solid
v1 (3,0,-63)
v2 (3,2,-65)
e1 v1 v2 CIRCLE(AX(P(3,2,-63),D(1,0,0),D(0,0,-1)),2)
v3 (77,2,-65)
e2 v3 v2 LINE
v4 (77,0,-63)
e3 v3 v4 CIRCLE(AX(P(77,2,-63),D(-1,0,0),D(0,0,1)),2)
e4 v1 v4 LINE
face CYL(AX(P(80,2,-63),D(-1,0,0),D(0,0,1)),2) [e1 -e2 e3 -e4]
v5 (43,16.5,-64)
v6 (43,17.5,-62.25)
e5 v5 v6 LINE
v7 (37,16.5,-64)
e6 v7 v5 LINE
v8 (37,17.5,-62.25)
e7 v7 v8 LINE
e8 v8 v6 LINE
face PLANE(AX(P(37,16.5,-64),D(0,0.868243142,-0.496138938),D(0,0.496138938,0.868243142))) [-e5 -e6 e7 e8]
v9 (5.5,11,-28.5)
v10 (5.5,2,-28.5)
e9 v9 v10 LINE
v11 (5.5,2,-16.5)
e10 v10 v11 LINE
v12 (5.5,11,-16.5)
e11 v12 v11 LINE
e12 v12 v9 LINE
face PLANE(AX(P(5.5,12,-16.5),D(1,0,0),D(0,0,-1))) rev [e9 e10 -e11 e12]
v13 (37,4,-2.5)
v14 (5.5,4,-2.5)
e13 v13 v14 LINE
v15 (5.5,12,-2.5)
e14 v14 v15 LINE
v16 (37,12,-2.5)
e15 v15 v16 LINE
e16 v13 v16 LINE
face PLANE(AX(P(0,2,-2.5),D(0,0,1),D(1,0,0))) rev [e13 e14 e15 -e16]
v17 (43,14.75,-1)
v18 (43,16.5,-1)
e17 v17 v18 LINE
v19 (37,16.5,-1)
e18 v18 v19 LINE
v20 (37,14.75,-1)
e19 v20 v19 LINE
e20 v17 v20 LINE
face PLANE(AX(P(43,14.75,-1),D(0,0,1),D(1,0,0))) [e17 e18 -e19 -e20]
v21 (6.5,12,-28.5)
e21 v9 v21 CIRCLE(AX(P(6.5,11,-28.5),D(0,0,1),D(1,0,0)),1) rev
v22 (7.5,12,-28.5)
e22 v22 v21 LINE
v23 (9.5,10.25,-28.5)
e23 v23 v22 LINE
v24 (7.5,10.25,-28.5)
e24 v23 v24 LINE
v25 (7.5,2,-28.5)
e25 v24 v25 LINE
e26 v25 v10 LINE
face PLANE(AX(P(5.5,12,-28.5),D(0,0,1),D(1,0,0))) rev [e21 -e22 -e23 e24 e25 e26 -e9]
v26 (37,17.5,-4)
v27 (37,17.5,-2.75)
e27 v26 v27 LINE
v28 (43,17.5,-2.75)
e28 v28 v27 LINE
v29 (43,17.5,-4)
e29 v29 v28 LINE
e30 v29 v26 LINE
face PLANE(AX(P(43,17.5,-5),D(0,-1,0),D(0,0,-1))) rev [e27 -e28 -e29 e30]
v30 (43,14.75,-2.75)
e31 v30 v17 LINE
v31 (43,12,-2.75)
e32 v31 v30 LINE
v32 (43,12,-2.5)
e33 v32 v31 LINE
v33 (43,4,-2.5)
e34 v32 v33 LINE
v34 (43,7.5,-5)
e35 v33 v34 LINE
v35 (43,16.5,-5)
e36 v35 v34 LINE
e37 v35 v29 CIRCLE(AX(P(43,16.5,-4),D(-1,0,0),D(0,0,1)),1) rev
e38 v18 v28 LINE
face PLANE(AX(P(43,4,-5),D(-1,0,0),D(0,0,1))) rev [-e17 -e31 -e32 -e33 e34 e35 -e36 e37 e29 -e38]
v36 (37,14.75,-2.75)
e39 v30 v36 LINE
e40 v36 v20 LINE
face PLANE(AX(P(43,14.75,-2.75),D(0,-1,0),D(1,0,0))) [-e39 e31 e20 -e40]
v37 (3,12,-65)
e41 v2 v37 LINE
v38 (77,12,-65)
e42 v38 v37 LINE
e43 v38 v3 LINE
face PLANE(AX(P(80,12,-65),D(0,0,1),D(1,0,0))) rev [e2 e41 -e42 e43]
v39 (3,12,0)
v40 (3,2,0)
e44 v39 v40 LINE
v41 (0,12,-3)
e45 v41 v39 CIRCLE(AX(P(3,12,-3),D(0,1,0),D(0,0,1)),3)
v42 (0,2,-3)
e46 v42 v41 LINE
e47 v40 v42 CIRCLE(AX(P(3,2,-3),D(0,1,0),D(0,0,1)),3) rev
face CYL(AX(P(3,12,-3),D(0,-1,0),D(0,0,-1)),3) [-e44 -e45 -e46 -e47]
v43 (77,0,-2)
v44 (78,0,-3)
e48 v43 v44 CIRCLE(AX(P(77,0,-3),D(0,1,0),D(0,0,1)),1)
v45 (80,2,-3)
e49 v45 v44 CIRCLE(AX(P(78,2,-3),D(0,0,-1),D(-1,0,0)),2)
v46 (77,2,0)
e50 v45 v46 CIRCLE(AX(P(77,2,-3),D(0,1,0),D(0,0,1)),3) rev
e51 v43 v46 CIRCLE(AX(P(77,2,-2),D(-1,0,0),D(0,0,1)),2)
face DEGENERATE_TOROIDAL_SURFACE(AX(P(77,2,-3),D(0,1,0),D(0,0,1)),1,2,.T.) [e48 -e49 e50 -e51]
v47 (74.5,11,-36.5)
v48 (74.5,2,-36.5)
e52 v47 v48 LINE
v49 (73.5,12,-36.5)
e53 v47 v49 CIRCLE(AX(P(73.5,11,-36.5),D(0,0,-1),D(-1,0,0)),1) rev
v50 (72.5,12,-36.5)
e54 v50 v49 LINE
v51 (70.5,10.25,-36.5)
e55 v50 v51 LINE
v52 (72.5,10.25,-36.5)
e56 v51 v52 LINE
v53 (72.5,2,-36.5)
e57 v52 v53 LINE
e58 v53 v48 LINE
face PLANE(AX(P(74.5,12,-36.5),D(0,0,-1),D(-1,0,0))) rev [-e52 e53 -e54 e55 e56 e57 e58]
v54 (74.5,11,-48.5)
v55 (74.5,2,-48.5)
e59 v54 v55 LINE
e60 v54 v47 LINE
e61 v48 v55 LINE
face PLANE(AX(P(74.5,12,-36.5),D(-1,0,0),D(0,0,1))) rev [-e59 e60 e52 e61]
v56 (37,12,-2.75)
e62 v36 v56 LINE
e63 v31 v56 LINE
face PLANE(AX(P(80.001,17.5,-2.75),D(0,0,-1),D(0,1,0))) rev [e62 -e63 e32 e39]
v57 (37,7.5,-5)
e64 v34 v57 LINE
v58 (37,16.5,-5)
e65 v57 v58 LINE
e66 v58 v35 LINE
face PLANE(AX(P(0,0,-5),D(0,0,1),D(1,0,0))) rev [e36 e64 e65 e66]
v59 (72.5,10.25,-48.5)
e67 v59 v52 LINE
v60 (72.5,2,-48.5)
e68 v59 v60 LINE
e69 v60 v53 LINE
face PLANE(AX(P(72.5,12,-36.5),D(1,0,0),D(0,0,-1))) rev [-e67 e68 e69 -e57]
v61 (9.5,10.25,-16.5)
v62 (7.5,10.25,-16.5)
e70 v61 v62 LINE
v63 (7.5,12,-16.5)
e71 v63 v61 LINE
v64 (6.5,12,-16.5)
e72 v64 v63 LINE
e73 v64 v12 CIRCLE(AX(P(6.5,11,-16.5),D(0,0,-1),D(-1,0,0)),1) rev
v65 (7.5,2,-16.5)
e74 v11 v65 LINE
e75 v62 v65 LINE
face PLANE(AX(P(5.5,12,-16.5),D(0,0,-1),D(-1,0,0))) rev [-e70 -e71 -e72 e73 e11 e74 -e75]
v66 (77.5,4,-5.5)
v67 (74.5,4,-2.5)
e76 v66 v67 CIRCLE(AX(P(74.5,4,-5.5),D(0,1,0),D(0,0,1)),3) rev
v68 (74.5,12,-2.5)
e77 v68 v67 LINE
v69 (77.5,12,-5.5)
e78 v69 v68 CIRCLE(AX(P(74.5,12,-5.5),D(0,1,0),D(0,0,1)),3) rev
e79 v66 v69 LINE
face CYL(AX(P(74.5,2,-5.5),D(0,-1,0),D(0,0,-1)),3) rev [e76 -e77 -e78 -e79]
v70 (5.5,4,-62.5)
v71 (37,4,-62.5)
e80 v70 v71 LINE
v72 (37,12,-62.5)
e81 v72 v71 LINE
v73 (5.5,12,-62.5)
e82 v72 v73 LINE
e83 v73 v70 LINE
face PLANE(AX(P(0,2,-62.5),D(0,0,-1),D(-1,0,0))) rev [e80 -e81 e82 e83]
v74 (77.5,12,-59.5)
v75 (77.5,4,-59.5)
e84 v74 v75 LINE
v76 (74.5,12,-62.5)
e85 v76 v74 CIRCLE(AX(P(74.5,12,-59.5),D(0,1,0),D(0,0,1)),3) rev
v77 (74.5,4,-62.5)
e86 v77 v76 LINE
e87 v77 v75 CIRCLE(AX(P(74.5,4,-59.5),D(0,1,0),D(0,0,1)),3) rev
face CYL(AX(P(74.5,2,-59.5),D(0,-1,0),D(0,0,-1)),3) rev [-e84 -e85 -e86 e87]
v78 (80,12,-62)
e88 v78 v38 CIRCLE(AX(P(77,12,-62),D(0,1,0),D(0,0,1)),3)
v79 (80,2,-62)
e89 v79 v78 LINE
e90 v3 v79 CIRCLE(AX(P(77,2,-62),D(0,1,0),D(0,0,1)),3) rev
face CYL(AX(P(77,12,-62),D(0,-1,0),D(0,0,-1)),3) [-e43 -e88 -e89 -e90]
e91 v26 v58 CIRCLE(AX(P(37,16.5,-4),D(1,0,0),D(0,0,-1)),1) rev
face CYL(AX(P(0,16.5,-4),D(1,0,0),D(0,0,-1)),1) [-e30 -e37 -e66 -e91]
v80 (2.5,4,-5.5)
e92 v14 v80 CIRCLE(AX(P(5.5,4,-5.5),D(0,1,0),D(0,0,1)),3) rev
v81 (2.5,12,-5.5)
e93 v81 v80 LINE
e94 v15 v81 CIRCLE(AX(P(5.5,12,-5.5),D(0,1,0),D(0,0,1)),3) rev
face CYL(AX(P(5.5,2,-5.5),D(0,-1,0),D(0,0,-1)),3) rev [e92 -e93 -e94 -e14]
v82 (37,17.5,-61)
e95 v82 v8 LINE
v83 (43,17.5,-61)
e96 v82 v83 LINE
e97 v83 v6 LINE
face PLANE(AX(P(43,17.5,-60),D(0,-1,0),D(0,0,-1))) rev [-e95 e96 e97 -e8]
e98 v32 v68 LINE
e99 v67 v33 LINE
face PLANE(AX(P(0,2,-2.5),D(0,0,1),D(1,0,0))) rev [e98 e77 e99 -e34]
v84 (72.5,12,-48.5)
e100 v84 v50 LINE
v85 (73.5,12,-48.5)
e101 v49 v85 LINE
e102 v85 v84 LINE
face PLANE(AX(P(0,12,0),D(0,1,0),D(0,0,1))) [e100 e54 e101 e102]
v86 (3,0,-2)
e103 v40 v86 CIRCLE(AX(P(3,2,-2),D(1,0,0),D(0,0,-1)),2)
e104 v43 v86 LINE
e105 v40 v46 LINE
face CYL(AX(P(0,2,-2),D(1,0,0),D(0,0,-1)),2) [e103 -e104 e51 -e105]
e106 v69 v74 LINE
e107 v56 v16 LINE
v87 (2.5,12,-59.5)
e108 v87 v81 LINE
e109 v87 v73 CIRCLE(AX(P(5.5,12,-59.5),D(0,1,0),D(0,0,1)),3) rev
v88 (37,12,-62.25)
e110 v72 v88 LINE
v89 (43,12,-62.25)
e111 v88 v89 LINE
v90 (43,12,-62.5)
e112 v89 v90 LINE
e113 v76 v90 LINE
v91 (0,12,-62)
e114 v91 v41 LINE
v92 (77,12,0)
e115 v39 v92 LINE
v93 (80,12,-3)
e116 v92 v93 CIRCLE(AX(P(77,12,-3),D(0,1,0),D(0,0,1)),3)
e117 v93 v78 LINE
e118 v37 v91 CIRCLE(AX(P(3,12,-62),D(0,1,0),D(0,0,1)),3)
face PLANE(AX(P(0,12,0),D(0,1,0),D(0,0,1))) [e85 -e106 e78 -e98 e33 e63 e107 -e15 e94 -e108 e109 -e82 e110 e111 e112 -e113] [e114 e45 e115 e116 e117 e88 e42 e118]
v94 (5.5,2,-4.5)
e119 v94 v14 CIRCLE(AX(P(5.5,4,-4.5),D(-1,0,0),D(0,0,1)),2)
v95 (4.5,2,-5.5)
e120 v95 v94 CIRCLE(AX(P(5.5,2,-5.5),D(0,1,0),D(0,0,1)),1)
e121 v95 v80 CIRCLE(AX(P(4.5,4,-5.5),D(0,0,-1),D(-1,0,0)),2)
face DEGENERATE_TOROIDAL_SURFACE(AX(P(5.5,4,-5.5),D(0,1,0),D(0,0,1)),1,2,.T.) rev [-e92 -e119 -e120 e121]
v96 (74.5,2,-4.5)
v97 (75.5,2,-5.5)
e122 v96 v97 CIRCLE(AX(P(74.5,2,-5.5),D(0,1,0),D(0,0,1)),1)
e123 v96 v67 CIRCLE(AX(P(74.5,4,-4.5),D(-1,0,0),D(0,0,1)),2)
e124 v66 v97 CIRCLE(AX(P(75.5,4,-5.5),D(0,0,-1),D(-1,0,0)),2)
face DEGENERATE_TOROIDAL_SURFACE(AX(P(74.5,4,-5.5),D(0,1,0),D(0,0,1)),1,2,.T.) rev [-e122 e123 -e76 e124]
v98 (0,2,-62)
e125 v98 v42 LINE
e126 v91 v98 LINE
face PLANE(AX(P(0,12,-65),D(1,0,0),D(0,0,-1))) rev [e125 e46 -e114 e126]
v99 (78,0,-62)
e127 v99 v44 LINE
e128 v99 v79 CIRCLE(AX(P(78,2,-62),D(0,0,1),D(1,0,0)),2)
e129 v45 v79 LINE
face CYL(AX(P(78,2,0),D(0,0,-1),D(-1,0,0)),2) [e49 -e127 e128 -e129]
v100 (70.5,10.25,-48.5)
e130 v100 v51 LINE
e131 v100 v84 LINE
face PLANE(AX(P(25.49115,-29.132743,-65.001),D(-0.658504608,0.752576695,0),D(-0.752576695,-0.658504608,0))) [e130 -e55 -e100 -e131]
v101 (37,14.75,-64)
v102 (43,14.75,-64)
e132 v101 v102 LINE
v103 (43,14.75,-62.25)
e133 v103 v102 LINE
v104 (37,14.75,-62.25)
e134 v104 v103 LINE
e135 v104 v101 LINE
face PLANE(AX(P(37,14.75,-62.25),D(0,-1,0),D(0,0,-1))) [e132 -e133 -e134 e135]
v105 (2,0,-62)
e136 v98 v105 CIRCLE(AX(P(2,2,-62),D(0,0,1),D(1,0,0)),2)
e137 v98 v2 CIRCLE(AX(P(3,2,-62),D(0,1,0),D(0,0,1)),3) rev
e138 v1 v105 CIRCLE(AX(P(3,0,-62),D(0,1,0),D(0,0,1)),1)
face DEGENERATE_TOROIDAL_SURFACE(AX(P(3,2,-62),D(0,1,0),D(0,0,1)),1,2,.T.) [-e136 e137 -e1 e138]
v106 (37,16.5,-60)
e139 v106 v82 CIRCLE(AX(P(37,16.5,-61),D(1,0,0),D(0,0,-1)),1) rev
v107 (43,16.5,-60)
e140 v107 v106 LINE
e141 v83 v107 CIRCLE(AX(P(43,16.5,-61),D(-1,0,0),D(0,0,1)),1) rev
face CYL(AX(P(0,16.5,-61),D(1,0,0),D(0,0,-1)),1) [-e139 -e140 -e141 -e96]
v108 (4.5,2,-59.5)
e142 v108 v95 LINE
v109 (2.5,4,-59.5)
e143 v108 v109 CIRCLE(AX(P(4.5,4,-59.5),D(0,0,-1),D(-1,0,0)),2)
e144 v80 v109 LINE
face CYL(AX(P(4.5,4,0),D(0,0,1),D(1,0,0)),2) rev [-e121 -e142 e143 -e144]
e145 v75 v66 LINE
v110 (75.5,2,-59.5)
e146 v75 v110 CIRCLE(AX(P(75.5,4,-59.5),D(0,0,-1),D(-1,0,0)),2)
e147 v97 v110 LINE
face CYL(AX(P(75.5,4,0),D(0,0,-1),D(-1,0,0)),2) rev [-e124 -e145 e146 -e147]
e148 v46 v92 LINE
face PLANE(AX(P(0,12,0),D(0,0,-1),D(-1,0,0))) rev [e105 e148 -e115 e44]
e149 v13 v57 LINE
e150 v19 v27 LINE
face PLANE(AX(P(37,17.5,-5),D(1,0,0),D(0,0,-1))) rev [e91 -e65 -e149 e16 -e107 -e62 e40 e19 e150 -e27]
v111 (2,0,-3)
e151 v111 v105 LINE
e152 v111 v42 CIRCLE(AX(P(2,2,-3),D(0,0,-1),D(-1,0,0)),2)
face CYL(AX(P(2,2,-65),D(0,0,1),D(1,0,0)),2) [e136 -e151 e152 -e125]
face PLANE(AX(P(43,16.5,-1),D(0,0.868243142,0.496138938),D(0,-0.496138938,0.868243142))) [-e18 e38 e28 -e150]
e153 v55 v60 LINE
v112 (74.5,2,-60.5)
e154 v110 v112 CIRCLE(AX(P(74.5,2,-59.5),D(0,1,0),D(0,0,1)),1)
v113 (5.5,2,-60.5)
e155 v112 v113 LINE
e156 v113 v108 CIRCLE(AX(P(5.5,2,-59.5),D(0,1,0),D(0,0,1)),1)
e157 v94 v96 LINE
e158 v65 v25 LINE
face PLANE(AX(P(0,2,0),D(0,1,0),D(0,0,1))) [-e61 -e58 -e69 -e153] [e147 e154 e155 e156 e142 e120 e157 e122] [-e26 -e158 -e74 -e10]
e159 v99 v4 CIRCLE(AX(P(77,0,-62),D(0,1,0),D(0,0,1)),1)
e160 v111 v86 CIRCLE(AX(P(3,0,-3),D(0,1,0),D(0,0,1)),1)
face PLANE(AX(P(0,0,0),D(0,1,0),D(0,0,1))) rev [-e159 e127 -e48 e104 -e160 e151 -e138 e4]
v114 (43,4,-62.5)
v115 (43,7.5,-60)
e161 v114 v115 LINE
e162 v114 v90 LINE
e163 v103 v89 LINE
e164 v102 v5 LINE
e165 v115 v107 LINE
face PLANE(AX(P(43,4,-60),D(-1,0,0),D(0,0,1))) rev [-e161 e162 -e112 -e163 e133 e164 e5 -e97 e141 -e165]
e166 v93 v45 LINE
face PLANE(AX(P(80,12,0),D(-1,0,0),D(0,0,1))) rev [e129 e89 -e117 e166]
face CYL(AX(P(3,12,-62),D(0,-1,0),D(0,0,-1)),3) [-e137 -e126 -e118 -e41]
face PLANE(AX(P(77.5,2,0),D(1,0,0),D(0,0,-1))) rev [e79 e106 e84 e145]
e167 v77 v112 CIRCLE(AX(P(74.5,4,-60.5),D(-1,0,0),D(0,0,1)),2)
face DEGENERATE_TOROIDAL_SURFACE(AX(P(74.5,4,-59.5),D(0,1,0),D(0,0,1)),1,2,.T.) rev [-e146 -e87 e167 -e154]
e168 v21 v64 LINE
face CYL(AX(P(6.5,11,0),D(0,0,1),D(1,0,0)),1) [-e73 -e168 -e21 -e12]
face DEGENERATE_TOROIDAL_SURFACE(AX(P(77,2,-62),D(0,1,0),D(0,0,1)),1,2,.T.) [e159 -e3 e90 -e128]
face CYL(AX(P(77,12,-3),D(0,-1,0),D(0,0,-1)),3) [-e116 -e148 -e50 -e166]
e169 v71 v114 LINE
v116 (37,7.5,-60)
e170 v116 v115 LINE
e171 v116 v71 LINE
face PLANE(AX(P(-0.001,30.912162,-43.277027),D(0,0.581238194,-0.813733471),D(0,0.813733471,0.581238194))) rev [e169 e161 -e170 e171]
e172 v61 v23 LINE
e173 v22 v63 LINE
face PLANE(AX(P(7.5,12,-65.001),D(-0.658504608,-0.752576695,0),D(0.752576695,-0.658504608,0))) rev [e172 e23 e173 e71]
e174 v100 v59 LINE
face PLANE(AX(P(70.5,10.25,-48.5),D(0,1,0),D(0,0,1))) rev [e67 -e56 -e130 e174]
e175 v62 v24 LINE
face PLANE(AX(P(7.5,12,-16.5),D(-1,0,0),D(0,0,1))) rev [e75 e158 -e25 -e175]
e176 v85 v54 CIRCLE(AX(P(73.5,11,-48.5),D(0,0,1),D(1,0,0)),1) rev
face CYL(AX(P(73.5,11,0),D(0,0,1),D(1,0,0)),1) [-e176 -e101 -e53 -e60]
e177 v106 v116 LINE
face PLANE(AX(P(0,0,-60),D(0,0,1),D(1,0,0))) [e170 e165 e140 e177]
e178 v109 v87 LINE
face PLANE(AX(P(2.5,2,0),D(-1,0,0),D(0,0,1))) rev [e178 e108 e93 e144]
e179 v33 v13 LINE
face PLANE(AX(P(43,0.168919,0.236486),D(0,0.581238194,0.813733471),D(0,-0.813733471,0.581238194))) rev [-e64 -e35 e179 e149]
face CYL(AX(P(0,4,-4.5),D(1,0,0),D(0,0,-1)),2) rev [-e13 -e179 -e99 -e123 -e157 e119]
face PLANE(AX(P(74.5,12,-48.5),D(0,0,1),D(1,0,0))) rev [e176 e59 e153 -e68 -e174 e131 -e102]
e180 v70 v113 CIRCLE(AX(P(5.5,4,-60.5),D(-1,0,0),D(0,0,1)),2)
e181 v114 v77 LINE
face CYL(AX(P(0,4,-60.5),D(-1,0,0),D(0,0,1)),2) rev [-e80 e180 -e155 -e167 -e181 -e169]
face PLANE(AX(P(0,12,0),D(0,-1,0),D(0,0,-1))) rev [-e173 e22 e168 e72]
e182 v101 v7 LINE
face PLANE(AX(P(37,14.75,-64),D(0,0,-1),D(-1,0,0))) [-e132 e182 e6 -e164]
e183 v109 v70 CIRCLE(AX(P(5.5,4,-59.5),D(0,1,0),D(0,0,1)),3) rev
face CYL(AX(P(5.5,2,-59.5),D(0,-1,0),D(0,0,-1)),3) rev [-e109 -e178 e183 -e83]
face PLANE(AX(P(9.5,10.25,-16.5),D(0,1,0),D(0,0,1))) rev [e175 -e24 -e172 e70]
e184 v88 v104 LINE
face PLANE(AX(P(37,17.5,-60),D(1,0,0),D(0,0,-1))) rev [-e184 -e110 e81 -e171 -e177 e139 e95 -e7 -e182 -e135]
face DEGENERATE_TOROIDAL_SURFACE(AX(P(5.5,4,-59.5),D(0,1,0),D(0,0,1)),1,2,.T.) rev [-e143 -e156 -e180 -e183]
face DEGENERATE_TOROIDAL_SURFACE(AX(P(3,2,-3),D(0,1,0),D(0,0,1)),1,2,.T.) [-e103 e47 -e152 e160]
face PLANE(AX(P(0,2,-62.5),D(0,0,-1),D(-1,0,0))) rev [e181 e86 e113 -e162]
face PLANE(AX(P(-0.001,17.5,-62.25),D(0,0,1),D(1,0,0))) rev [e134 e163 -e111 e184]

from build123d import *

# Parameters (mm, degrees)
SKETCH1_W            = 80
SKETCH1_H            = 65
BOSS_EXTRUDE1_DEPTH  = 12
SKETCH2_W            = 75
SKETCH2_H            = 60
CUT_EXTRUDE1_DEPTH   = 10
FILLET4_R            = 2
FILLET5_R            = 3
FILLET8_R            = 2
SKETCH5_W            = 6
SKETCH5_H            = 13.5
BOSS_EXTRUDE2_DEPTH  = 2.5
CUT_EXTRUDE3_REACH   = 81.876
SKETCH6_W            = 0.25
SKETCH6_H            = 5.5
BOSS_EXTRUDE3_DEPTH  = 6
CUT_EXTRUDE4_REACH   = 81.876
SKETCH10_W           = 6
SKETCH10_H           = 13.5
BOSS_EXTRUDE4_DEPTH  = 2.5
CUT_EXTRUDE5_REACH   = 81.876
SKETCH11_W           = 0.25
SKETCH11_H           = 5.5
BOSS_EXTRUDE5_DEPTH  = 6
CUT_EXTRUDE6_DEPTH   = 6
SKETCH14_W           = 2
SKETCH14_H           = 12
BOSS_EXTRUDE7_DEPTH  = 10
SKETCH15_W           = 12
SKETCH15_H           = 1.75
BOSS_EXTRUDE8_DEPTH  = 2
SKETCH16_W           = 2
SKETCH16_H           = 12
BOSS_EXTRUDE9_DEPTH  = 10
SKETCH17_W           = 12
SKETCH17_H           = 1.75
BOSS_EXTRUDE10_DEPTH = 2
FILLET9_R            = 1
CUT_EXTRUDE7_REACH   = 97.176
CUT_EXTRUDE8_REACH   = 91.658


with BuildPart() as part:
    # Sketch1 → Boss-Extrude1 (new body)
    with BuildSketch(Plane(origin=(0, 0, 0), x_dir=(1, 0, 0), z_dir=(0, 1, 0))):
        with Locations((40, 32.5)):
            Rectangle(SKETCH1_W, SKETCH1_H)
    extrude(amount=BOSS_EXTRUDE1_DEPTH)

    # Sketch2 → Cut-Extrude1 (cut)
    with BuildSketch(Plane(origin=(0, 12, 0), x_dir=(1, 0, 0), z_dir=(0, 1, 0))):
        with Locations((40, 32.5)):
            Rectangle(SKETCH2_W, SKETCH2_H)
    extrude(amount=-CUT_EXTRUDE1_DEPTH, mode=Mode.SUBTRACT)

    # Fillet4
    fillet4_edges = [part.edges().sort_by_distance(p)[0] for p in [
        (40, 0, -65),
        (80, 0, -32.5),
        (40, 0, 0),
        (0, 0, -32.5),
    ]]
    fillet(fillet4_edges, radius=FILLET4_R)

    # Fillet5
    # the kernel refuses this fillet: 3 mm, written as the material it adds along each edge
    with BuildSketch(Plane(origin=(2.5, 12, -2.5), x_dir=(0, 0, -1), z_dir=(0, -1, 0)), Plane(origin=(77.5, 12, -62.5), x_dir=(0, 0, 1), z_dir=(0, -1, 0)), Plane(origin=(77.5, 12, -2.5), x_dir=(-1, 0, 0), z_dir=(0, -1, 0))) as fillet5_piece_1:
        with BuildLine():
            CenterArc((FILLET5_R, FILLET5_R), FILLET5_R, 180, 90)
            Line((0, FILLET5_R), (0, 0))
            Line((0, 0), (FILLET5_R, 0))
        make_face()
    extrude(amount=10)
    with BuildSketch(Plane(origin=(2.5, 12, -62.5), x_dir=(0, 0, 1), z_dir=(0, -1, 0))) as fillet5_piece_2:
        with BuildLine():
            CenterArc((FILLET5_R, -FILLET5_R), FILLET5_R, 90, 90)
            Line((0, -FILLET5_R), (0, 0))
            Line((0, 0), (FILLET5_R, 0))
        make_face()
    extrude(amount=10)
    # the kernel refuses this fillet: 3 mm, written as the material it takes off along each edge
    with BuildSketch(Plane(origin=(77, 0, -62), x_dir=(0, 0, -1), z_dir=(-1, 0, 0))) as fillet5_2_piece_1:
        with BuildLine():
            CenterArc((1, -2), 2, 0, 90)
            Line((3, -2), (3, 0))
            Line((3, 0), (1, 0))
        make_face()
    revolve(axis=Axis((77, 0, -62), (0, -1, 0)), revolution_arc=90, mode=Mode.SUBTRACT)
    with BuildSketch(Plane(origin=(77, 0, -3), x_dir=(1, 0, 0), z_dir=(0, 0, -1))) as fillet5_2_piece_2:
        with BuildLine():
            CenterArc((1, -2), 2, 0, 90)
            Line((3, -2), (3, 0))
            Line((3, 0), (1, 0))
        make_face()
    revolve(axis=Axis((77, 0, -3), (0, -1, 0)), revolution_arc=90, mode=Mode.SUBTRACT)
    with BuildSketch(Plane(origin=(3, 0, -62), x_dir=(-1, 0, 0), z_dir=(0, 0, 1))) as fillet5_2_piece_3:
        with BuildLine():
            CenterArc((1, -2), 2, 0, 90)
            Line((3, -2), (3, 0))
            Line((3, 0), (1, 0))
        make_face()
    revolve(axis=Axis((3, 0, -62), (0, -1, 0)), revolution_arc=90, mode=Mode.SUBTRACT)
    with BuildSketch(Plane(origin=(3, 0, -3), x_dir=(0, 0, 1), z_dir=(1, 0, 0))) as fillet5_2_piece_4:
        with BuildLine():
            CenterArc((1, -2), 2, 0, 90)
            Line((3, -2), (3, 0))
            Line((3, 0), (1, 0))
        make_face()
    revolve(axis=Axis((3, 0, -3), (0, -1, 0)), revolution_arc=90, mode=Mode.SUBTRACT)
    with BuildSketch(Plane(origin=(0, 0, -65), x_dir=(0, 0, 1), z_dir=(0, 1, 0)), Plane(origin=(0, 0, 0), x_dir=(1, 0, 0), z_dir=(0, 1, 0))) as fillet5_2_piece_5:
        with BuildLine():
            CenterArc((FILLET5_R, FILLET5_R), FILLET5_R, 180, 90)
            Line((0, FILLET5_R), (0, 0))
            Line((0, 0), (FILLET5_R, 0))
        make_face()
    extrude(amount=19.5, mode=Mode.SUBTRACT)
    with BuildSketch(Plane(origin=(80, 0, -65), x_dir=(0, 0, 1), z_dir=(0, 1, 0)), Plane(origin=(80, 0, 0), x_dir=(-1, 0, 0), z_dir=(0, 1, 0))) as fillet5_2_piece_6:
        with BuildLine():
            CenterArc((FILLET5_R, -FILLET5_R), FILLET5_R, 90, 90)
            Line((0, -FILLET5_R), (0, 0))
            Line((0, 0), (FILLET5_R, 0))
        make_face()
    extrude(amount=19.5, mode=Mode.SUBTRACT)

    # Fillet8
    fillet8_edges = [part.edges().sort_by_distance(p)[0] for p in [
        (40, 2, -2.5),
        (2.5, 2, -32.5),
        (77.5, 2, -32.5),
        (40, 2, -62.5),
        (3.378679656, 2, -61.621320344),
        (76.621320344, 2, -61.621320344),
        (76.621320344, 2, -3.378679656),
        (3.378679656, 2, -3.378679656),
    ]]
    fillet(fillet8_edges, radius=FILLET8_R)

    # Sketch5 → Boss-Extrude2 (add)
    with BuildSketch(Plane.XY.offset(-62.5)):
        with Locations((40, 10.75)):
            Rectangle(SKETCH5_W, SKETCH5_H)
    extrude(amount=BOSS_EXTRUDE2_DEPTH)

    # Sketch6 → Cut-Extrude3 (cut, up to next)
    with BuildSketch(Plane(origin=(43, 0, 0), x_dir=(0, 0, -1), z_dir=(1, 0, 0)), mode=Mode.PRIVATE) as cut_extrude3_sk1:
        with Locations((62.375, 14.75)):
            Rectangle(SKETCH6_W, SKETCH6_H)
    cut_extrude3_tool1 = extrude(cut_extrude3_sk1.sketch, amount=-CUT_EXTRUDE3_REACH, mode=Mode.PRIVATE) & part.part
    add(cut_extrude3_tool1.solids().sort_by_distance((43, 14.75, -62.375))[0], mode=Mode.SUBTRACT)

    # Sketch7 → Boss-Extrude3 (add)
    with BuildSketch(Plane(origin=(43, 0, 0), x_dir=(0, 0, -1), z_dir=(1, 0, 0))):
        Polygon((62.25, 14.75), (64, 14.75), (64, 16.5), (62.25, 17.5), align=None)
    extrude(amount=-BOSS_EXTRUDE3_DEPTH)

    # Sketch8 → Cut-Extrude4 (cut, up to next)
    with BuildSketch(Plane(origin=(43, 0, 0), x_dir=(0, 0, -1), z_dir=(1, 0, 0)), mode=Mode.PRIVATE) as cut_extrude4_sk1:
        Polygon((60, 4), (62.5, 4), (60, 7.5), align=None)
    cut_extrude4_tool1 = extrude(cut_extrude4_sk1.sketch, amount=-CUT_EXTRUDE4_REACH, mode=Mode.PRIVATE) & part.part
    add(cut_extrude4_tool1.solids().sort_by_distance((43, 5.166667, -60.833333))[0], mode=Mode.SUBTRACT)

    # Sketch10 → Boss-Extrude4 (add)
    with BuildSketch(Plane(origin=(0, 0, -2.5), x_dir=(-1, 0, 0), z_dir=(0, 0, -1))):
        with Locations((-40, 10.75)):
            Rectangle(SKETCH10_W, SKETCH10_H)
    extrude(amount=BOSS_EXTRUDE4_DEPTH)

    # Sketch11 → Cut-Extrude5 (cut, up to next)
    with BuildSketch(Plane.ZY.offset(-37), mode=Mode.PRIVATE) as cut_extrude5_sk1:
        with Locations((-2.625, 14.75)):
            Rectangle(SKETCH11_W, SKETCH11_H)
    cut_extrude5_tool1 = extrude(cut_extrude5_sk1.sketch, amount=-CUT_EXTRUDE5_REACH, mode=Mode.PRIVATE) & part.part
    add(cut_extrude5_tool1.solids().sort_by_distance((37, 14.75, -2.625))[0], mode=Mode.SUBTRACT)

    # Sketch12 → Boss-Extrude5 (add)
    with BuildSketch(Plane.ZY.offset(-37)):
        Polygon((-2.75, 14.75), (-1, 14.75), (-1, 16.5), (-2.75, 17.5), align=None)
    extrude(amount=-BOSS_EXTRUDE5_DEPTH)

    # Sketch13 → Cut-Extrude6 (cut)
    with BuildSketch(Plane.ZY.offset(-37)):
        Polygon((-5, 4), (-2.5, 4), (-5, 7.5), align=None)
    extrude(amount=-CUT_EXTRUDE6_DEPTH, mode=Mode.SUBTRACT)

    # Sketch14 → Boss-Extrude7 (add)
    with BuildSketch(Plane(origin=(0, 2, 0), x_dir=(1, 0, 0), z_dir=(0, 1, 0))):
        with Locations((6.5, 22.5)):
            Rectangle(SKETCH14_W, SKETCH14_H)
    extrude(amount=BOSS_EXTRUDE7_DEPTH)

    # Sketch15 → Boss-Extrude8 (add)
    with BuildSketch(Plane(origin=(7.5, 0, 0), x_dir=(0, 0, -1), z_dir=(1, 0, 0))):
        with Locations((22.5, 11.125)):
            Rectangle(SKETCH15_W, SKETCH15_H)
    extrude(amount=BOSS_EXTRUDE8_DEPTH)

    # Sketch16 → Boss-Extrude9 (add)
    with BuildSketch(Plane(origin=(0, 2, 0), x_dir=(1, 0, 0), z_dir=(0, 1, 0))):
        with Locations((73.5, 42.5)):
            Rectangle(SKETCH16_W, SKETCH16_H)
    extrude(amount=BOSS_EXTRUDE9_DEPTH)

    # Sketch17 → Boss-Extrude10 (add)
    with BuildSketch(Plane.ZY.offset(-72.5)):
        with Locations((-42.5, 11.125)):
            Rectangle(SKETCH17_W, SKETCH17_H)
    extrude(amount=BOSS_EXTRUDE10_DEPTH)

    # Fillet9
    fillet9_edges = [part.edges().sort_by_distance(p)[0] for p in [
        (40, 17.5, -60),
        (40, 17.5, -5),
        (5.5, 12, -22.5),
        (74.5, 12, -42.5),
    ]]
    fillet(fillet9_edges, radius=FILLET9_R)

    # Sketch18 → Cut-Extrude7 (cut, up to next)
    with BuildSketch(Plane.XY.offset(-16.5), mode=Mode.PRIVATE) as cut_extrude7_sk1:
        Polygon((7.5, 12), (9.5, 10.25), (9.5, 12), align=None)
    cut_extrude7_tool1 = extrude(cut_extrude7_sk1.sketch, amount=-CUT_EXTRUDE7_REACH, mode=Mode.PRIVATE) & part.part
    add(cut_extrude7_tool1.solids().sort_by_distance((8.833333, 11.416667, -16.5))[0], mode=Mode.SUBTRACT)

    # Sketch19 → Cut-Extrude8 (cut, up to next)
    with BuildSketch(Plane.XY.offset(-36.5), mode=Mode.PRIVATE) as cut_extrude8_sk1:
        Polygon((70.5, 10.25), (72.5, 12), (70.5, 12), align=None)
    cut_extrude8_tool1 = extrude(cut_extrude8_sk1.sketch, amount=-CUT_EXTRUDE8_REACH, mode=Mode.PRIVATE) & part.part
    add(cut_extrude8_tool1.solids().sort_by_distance((71.166667, 11.416667, -36.5))[0], mode=Mode.SUBTRACT)


solid = part.part
